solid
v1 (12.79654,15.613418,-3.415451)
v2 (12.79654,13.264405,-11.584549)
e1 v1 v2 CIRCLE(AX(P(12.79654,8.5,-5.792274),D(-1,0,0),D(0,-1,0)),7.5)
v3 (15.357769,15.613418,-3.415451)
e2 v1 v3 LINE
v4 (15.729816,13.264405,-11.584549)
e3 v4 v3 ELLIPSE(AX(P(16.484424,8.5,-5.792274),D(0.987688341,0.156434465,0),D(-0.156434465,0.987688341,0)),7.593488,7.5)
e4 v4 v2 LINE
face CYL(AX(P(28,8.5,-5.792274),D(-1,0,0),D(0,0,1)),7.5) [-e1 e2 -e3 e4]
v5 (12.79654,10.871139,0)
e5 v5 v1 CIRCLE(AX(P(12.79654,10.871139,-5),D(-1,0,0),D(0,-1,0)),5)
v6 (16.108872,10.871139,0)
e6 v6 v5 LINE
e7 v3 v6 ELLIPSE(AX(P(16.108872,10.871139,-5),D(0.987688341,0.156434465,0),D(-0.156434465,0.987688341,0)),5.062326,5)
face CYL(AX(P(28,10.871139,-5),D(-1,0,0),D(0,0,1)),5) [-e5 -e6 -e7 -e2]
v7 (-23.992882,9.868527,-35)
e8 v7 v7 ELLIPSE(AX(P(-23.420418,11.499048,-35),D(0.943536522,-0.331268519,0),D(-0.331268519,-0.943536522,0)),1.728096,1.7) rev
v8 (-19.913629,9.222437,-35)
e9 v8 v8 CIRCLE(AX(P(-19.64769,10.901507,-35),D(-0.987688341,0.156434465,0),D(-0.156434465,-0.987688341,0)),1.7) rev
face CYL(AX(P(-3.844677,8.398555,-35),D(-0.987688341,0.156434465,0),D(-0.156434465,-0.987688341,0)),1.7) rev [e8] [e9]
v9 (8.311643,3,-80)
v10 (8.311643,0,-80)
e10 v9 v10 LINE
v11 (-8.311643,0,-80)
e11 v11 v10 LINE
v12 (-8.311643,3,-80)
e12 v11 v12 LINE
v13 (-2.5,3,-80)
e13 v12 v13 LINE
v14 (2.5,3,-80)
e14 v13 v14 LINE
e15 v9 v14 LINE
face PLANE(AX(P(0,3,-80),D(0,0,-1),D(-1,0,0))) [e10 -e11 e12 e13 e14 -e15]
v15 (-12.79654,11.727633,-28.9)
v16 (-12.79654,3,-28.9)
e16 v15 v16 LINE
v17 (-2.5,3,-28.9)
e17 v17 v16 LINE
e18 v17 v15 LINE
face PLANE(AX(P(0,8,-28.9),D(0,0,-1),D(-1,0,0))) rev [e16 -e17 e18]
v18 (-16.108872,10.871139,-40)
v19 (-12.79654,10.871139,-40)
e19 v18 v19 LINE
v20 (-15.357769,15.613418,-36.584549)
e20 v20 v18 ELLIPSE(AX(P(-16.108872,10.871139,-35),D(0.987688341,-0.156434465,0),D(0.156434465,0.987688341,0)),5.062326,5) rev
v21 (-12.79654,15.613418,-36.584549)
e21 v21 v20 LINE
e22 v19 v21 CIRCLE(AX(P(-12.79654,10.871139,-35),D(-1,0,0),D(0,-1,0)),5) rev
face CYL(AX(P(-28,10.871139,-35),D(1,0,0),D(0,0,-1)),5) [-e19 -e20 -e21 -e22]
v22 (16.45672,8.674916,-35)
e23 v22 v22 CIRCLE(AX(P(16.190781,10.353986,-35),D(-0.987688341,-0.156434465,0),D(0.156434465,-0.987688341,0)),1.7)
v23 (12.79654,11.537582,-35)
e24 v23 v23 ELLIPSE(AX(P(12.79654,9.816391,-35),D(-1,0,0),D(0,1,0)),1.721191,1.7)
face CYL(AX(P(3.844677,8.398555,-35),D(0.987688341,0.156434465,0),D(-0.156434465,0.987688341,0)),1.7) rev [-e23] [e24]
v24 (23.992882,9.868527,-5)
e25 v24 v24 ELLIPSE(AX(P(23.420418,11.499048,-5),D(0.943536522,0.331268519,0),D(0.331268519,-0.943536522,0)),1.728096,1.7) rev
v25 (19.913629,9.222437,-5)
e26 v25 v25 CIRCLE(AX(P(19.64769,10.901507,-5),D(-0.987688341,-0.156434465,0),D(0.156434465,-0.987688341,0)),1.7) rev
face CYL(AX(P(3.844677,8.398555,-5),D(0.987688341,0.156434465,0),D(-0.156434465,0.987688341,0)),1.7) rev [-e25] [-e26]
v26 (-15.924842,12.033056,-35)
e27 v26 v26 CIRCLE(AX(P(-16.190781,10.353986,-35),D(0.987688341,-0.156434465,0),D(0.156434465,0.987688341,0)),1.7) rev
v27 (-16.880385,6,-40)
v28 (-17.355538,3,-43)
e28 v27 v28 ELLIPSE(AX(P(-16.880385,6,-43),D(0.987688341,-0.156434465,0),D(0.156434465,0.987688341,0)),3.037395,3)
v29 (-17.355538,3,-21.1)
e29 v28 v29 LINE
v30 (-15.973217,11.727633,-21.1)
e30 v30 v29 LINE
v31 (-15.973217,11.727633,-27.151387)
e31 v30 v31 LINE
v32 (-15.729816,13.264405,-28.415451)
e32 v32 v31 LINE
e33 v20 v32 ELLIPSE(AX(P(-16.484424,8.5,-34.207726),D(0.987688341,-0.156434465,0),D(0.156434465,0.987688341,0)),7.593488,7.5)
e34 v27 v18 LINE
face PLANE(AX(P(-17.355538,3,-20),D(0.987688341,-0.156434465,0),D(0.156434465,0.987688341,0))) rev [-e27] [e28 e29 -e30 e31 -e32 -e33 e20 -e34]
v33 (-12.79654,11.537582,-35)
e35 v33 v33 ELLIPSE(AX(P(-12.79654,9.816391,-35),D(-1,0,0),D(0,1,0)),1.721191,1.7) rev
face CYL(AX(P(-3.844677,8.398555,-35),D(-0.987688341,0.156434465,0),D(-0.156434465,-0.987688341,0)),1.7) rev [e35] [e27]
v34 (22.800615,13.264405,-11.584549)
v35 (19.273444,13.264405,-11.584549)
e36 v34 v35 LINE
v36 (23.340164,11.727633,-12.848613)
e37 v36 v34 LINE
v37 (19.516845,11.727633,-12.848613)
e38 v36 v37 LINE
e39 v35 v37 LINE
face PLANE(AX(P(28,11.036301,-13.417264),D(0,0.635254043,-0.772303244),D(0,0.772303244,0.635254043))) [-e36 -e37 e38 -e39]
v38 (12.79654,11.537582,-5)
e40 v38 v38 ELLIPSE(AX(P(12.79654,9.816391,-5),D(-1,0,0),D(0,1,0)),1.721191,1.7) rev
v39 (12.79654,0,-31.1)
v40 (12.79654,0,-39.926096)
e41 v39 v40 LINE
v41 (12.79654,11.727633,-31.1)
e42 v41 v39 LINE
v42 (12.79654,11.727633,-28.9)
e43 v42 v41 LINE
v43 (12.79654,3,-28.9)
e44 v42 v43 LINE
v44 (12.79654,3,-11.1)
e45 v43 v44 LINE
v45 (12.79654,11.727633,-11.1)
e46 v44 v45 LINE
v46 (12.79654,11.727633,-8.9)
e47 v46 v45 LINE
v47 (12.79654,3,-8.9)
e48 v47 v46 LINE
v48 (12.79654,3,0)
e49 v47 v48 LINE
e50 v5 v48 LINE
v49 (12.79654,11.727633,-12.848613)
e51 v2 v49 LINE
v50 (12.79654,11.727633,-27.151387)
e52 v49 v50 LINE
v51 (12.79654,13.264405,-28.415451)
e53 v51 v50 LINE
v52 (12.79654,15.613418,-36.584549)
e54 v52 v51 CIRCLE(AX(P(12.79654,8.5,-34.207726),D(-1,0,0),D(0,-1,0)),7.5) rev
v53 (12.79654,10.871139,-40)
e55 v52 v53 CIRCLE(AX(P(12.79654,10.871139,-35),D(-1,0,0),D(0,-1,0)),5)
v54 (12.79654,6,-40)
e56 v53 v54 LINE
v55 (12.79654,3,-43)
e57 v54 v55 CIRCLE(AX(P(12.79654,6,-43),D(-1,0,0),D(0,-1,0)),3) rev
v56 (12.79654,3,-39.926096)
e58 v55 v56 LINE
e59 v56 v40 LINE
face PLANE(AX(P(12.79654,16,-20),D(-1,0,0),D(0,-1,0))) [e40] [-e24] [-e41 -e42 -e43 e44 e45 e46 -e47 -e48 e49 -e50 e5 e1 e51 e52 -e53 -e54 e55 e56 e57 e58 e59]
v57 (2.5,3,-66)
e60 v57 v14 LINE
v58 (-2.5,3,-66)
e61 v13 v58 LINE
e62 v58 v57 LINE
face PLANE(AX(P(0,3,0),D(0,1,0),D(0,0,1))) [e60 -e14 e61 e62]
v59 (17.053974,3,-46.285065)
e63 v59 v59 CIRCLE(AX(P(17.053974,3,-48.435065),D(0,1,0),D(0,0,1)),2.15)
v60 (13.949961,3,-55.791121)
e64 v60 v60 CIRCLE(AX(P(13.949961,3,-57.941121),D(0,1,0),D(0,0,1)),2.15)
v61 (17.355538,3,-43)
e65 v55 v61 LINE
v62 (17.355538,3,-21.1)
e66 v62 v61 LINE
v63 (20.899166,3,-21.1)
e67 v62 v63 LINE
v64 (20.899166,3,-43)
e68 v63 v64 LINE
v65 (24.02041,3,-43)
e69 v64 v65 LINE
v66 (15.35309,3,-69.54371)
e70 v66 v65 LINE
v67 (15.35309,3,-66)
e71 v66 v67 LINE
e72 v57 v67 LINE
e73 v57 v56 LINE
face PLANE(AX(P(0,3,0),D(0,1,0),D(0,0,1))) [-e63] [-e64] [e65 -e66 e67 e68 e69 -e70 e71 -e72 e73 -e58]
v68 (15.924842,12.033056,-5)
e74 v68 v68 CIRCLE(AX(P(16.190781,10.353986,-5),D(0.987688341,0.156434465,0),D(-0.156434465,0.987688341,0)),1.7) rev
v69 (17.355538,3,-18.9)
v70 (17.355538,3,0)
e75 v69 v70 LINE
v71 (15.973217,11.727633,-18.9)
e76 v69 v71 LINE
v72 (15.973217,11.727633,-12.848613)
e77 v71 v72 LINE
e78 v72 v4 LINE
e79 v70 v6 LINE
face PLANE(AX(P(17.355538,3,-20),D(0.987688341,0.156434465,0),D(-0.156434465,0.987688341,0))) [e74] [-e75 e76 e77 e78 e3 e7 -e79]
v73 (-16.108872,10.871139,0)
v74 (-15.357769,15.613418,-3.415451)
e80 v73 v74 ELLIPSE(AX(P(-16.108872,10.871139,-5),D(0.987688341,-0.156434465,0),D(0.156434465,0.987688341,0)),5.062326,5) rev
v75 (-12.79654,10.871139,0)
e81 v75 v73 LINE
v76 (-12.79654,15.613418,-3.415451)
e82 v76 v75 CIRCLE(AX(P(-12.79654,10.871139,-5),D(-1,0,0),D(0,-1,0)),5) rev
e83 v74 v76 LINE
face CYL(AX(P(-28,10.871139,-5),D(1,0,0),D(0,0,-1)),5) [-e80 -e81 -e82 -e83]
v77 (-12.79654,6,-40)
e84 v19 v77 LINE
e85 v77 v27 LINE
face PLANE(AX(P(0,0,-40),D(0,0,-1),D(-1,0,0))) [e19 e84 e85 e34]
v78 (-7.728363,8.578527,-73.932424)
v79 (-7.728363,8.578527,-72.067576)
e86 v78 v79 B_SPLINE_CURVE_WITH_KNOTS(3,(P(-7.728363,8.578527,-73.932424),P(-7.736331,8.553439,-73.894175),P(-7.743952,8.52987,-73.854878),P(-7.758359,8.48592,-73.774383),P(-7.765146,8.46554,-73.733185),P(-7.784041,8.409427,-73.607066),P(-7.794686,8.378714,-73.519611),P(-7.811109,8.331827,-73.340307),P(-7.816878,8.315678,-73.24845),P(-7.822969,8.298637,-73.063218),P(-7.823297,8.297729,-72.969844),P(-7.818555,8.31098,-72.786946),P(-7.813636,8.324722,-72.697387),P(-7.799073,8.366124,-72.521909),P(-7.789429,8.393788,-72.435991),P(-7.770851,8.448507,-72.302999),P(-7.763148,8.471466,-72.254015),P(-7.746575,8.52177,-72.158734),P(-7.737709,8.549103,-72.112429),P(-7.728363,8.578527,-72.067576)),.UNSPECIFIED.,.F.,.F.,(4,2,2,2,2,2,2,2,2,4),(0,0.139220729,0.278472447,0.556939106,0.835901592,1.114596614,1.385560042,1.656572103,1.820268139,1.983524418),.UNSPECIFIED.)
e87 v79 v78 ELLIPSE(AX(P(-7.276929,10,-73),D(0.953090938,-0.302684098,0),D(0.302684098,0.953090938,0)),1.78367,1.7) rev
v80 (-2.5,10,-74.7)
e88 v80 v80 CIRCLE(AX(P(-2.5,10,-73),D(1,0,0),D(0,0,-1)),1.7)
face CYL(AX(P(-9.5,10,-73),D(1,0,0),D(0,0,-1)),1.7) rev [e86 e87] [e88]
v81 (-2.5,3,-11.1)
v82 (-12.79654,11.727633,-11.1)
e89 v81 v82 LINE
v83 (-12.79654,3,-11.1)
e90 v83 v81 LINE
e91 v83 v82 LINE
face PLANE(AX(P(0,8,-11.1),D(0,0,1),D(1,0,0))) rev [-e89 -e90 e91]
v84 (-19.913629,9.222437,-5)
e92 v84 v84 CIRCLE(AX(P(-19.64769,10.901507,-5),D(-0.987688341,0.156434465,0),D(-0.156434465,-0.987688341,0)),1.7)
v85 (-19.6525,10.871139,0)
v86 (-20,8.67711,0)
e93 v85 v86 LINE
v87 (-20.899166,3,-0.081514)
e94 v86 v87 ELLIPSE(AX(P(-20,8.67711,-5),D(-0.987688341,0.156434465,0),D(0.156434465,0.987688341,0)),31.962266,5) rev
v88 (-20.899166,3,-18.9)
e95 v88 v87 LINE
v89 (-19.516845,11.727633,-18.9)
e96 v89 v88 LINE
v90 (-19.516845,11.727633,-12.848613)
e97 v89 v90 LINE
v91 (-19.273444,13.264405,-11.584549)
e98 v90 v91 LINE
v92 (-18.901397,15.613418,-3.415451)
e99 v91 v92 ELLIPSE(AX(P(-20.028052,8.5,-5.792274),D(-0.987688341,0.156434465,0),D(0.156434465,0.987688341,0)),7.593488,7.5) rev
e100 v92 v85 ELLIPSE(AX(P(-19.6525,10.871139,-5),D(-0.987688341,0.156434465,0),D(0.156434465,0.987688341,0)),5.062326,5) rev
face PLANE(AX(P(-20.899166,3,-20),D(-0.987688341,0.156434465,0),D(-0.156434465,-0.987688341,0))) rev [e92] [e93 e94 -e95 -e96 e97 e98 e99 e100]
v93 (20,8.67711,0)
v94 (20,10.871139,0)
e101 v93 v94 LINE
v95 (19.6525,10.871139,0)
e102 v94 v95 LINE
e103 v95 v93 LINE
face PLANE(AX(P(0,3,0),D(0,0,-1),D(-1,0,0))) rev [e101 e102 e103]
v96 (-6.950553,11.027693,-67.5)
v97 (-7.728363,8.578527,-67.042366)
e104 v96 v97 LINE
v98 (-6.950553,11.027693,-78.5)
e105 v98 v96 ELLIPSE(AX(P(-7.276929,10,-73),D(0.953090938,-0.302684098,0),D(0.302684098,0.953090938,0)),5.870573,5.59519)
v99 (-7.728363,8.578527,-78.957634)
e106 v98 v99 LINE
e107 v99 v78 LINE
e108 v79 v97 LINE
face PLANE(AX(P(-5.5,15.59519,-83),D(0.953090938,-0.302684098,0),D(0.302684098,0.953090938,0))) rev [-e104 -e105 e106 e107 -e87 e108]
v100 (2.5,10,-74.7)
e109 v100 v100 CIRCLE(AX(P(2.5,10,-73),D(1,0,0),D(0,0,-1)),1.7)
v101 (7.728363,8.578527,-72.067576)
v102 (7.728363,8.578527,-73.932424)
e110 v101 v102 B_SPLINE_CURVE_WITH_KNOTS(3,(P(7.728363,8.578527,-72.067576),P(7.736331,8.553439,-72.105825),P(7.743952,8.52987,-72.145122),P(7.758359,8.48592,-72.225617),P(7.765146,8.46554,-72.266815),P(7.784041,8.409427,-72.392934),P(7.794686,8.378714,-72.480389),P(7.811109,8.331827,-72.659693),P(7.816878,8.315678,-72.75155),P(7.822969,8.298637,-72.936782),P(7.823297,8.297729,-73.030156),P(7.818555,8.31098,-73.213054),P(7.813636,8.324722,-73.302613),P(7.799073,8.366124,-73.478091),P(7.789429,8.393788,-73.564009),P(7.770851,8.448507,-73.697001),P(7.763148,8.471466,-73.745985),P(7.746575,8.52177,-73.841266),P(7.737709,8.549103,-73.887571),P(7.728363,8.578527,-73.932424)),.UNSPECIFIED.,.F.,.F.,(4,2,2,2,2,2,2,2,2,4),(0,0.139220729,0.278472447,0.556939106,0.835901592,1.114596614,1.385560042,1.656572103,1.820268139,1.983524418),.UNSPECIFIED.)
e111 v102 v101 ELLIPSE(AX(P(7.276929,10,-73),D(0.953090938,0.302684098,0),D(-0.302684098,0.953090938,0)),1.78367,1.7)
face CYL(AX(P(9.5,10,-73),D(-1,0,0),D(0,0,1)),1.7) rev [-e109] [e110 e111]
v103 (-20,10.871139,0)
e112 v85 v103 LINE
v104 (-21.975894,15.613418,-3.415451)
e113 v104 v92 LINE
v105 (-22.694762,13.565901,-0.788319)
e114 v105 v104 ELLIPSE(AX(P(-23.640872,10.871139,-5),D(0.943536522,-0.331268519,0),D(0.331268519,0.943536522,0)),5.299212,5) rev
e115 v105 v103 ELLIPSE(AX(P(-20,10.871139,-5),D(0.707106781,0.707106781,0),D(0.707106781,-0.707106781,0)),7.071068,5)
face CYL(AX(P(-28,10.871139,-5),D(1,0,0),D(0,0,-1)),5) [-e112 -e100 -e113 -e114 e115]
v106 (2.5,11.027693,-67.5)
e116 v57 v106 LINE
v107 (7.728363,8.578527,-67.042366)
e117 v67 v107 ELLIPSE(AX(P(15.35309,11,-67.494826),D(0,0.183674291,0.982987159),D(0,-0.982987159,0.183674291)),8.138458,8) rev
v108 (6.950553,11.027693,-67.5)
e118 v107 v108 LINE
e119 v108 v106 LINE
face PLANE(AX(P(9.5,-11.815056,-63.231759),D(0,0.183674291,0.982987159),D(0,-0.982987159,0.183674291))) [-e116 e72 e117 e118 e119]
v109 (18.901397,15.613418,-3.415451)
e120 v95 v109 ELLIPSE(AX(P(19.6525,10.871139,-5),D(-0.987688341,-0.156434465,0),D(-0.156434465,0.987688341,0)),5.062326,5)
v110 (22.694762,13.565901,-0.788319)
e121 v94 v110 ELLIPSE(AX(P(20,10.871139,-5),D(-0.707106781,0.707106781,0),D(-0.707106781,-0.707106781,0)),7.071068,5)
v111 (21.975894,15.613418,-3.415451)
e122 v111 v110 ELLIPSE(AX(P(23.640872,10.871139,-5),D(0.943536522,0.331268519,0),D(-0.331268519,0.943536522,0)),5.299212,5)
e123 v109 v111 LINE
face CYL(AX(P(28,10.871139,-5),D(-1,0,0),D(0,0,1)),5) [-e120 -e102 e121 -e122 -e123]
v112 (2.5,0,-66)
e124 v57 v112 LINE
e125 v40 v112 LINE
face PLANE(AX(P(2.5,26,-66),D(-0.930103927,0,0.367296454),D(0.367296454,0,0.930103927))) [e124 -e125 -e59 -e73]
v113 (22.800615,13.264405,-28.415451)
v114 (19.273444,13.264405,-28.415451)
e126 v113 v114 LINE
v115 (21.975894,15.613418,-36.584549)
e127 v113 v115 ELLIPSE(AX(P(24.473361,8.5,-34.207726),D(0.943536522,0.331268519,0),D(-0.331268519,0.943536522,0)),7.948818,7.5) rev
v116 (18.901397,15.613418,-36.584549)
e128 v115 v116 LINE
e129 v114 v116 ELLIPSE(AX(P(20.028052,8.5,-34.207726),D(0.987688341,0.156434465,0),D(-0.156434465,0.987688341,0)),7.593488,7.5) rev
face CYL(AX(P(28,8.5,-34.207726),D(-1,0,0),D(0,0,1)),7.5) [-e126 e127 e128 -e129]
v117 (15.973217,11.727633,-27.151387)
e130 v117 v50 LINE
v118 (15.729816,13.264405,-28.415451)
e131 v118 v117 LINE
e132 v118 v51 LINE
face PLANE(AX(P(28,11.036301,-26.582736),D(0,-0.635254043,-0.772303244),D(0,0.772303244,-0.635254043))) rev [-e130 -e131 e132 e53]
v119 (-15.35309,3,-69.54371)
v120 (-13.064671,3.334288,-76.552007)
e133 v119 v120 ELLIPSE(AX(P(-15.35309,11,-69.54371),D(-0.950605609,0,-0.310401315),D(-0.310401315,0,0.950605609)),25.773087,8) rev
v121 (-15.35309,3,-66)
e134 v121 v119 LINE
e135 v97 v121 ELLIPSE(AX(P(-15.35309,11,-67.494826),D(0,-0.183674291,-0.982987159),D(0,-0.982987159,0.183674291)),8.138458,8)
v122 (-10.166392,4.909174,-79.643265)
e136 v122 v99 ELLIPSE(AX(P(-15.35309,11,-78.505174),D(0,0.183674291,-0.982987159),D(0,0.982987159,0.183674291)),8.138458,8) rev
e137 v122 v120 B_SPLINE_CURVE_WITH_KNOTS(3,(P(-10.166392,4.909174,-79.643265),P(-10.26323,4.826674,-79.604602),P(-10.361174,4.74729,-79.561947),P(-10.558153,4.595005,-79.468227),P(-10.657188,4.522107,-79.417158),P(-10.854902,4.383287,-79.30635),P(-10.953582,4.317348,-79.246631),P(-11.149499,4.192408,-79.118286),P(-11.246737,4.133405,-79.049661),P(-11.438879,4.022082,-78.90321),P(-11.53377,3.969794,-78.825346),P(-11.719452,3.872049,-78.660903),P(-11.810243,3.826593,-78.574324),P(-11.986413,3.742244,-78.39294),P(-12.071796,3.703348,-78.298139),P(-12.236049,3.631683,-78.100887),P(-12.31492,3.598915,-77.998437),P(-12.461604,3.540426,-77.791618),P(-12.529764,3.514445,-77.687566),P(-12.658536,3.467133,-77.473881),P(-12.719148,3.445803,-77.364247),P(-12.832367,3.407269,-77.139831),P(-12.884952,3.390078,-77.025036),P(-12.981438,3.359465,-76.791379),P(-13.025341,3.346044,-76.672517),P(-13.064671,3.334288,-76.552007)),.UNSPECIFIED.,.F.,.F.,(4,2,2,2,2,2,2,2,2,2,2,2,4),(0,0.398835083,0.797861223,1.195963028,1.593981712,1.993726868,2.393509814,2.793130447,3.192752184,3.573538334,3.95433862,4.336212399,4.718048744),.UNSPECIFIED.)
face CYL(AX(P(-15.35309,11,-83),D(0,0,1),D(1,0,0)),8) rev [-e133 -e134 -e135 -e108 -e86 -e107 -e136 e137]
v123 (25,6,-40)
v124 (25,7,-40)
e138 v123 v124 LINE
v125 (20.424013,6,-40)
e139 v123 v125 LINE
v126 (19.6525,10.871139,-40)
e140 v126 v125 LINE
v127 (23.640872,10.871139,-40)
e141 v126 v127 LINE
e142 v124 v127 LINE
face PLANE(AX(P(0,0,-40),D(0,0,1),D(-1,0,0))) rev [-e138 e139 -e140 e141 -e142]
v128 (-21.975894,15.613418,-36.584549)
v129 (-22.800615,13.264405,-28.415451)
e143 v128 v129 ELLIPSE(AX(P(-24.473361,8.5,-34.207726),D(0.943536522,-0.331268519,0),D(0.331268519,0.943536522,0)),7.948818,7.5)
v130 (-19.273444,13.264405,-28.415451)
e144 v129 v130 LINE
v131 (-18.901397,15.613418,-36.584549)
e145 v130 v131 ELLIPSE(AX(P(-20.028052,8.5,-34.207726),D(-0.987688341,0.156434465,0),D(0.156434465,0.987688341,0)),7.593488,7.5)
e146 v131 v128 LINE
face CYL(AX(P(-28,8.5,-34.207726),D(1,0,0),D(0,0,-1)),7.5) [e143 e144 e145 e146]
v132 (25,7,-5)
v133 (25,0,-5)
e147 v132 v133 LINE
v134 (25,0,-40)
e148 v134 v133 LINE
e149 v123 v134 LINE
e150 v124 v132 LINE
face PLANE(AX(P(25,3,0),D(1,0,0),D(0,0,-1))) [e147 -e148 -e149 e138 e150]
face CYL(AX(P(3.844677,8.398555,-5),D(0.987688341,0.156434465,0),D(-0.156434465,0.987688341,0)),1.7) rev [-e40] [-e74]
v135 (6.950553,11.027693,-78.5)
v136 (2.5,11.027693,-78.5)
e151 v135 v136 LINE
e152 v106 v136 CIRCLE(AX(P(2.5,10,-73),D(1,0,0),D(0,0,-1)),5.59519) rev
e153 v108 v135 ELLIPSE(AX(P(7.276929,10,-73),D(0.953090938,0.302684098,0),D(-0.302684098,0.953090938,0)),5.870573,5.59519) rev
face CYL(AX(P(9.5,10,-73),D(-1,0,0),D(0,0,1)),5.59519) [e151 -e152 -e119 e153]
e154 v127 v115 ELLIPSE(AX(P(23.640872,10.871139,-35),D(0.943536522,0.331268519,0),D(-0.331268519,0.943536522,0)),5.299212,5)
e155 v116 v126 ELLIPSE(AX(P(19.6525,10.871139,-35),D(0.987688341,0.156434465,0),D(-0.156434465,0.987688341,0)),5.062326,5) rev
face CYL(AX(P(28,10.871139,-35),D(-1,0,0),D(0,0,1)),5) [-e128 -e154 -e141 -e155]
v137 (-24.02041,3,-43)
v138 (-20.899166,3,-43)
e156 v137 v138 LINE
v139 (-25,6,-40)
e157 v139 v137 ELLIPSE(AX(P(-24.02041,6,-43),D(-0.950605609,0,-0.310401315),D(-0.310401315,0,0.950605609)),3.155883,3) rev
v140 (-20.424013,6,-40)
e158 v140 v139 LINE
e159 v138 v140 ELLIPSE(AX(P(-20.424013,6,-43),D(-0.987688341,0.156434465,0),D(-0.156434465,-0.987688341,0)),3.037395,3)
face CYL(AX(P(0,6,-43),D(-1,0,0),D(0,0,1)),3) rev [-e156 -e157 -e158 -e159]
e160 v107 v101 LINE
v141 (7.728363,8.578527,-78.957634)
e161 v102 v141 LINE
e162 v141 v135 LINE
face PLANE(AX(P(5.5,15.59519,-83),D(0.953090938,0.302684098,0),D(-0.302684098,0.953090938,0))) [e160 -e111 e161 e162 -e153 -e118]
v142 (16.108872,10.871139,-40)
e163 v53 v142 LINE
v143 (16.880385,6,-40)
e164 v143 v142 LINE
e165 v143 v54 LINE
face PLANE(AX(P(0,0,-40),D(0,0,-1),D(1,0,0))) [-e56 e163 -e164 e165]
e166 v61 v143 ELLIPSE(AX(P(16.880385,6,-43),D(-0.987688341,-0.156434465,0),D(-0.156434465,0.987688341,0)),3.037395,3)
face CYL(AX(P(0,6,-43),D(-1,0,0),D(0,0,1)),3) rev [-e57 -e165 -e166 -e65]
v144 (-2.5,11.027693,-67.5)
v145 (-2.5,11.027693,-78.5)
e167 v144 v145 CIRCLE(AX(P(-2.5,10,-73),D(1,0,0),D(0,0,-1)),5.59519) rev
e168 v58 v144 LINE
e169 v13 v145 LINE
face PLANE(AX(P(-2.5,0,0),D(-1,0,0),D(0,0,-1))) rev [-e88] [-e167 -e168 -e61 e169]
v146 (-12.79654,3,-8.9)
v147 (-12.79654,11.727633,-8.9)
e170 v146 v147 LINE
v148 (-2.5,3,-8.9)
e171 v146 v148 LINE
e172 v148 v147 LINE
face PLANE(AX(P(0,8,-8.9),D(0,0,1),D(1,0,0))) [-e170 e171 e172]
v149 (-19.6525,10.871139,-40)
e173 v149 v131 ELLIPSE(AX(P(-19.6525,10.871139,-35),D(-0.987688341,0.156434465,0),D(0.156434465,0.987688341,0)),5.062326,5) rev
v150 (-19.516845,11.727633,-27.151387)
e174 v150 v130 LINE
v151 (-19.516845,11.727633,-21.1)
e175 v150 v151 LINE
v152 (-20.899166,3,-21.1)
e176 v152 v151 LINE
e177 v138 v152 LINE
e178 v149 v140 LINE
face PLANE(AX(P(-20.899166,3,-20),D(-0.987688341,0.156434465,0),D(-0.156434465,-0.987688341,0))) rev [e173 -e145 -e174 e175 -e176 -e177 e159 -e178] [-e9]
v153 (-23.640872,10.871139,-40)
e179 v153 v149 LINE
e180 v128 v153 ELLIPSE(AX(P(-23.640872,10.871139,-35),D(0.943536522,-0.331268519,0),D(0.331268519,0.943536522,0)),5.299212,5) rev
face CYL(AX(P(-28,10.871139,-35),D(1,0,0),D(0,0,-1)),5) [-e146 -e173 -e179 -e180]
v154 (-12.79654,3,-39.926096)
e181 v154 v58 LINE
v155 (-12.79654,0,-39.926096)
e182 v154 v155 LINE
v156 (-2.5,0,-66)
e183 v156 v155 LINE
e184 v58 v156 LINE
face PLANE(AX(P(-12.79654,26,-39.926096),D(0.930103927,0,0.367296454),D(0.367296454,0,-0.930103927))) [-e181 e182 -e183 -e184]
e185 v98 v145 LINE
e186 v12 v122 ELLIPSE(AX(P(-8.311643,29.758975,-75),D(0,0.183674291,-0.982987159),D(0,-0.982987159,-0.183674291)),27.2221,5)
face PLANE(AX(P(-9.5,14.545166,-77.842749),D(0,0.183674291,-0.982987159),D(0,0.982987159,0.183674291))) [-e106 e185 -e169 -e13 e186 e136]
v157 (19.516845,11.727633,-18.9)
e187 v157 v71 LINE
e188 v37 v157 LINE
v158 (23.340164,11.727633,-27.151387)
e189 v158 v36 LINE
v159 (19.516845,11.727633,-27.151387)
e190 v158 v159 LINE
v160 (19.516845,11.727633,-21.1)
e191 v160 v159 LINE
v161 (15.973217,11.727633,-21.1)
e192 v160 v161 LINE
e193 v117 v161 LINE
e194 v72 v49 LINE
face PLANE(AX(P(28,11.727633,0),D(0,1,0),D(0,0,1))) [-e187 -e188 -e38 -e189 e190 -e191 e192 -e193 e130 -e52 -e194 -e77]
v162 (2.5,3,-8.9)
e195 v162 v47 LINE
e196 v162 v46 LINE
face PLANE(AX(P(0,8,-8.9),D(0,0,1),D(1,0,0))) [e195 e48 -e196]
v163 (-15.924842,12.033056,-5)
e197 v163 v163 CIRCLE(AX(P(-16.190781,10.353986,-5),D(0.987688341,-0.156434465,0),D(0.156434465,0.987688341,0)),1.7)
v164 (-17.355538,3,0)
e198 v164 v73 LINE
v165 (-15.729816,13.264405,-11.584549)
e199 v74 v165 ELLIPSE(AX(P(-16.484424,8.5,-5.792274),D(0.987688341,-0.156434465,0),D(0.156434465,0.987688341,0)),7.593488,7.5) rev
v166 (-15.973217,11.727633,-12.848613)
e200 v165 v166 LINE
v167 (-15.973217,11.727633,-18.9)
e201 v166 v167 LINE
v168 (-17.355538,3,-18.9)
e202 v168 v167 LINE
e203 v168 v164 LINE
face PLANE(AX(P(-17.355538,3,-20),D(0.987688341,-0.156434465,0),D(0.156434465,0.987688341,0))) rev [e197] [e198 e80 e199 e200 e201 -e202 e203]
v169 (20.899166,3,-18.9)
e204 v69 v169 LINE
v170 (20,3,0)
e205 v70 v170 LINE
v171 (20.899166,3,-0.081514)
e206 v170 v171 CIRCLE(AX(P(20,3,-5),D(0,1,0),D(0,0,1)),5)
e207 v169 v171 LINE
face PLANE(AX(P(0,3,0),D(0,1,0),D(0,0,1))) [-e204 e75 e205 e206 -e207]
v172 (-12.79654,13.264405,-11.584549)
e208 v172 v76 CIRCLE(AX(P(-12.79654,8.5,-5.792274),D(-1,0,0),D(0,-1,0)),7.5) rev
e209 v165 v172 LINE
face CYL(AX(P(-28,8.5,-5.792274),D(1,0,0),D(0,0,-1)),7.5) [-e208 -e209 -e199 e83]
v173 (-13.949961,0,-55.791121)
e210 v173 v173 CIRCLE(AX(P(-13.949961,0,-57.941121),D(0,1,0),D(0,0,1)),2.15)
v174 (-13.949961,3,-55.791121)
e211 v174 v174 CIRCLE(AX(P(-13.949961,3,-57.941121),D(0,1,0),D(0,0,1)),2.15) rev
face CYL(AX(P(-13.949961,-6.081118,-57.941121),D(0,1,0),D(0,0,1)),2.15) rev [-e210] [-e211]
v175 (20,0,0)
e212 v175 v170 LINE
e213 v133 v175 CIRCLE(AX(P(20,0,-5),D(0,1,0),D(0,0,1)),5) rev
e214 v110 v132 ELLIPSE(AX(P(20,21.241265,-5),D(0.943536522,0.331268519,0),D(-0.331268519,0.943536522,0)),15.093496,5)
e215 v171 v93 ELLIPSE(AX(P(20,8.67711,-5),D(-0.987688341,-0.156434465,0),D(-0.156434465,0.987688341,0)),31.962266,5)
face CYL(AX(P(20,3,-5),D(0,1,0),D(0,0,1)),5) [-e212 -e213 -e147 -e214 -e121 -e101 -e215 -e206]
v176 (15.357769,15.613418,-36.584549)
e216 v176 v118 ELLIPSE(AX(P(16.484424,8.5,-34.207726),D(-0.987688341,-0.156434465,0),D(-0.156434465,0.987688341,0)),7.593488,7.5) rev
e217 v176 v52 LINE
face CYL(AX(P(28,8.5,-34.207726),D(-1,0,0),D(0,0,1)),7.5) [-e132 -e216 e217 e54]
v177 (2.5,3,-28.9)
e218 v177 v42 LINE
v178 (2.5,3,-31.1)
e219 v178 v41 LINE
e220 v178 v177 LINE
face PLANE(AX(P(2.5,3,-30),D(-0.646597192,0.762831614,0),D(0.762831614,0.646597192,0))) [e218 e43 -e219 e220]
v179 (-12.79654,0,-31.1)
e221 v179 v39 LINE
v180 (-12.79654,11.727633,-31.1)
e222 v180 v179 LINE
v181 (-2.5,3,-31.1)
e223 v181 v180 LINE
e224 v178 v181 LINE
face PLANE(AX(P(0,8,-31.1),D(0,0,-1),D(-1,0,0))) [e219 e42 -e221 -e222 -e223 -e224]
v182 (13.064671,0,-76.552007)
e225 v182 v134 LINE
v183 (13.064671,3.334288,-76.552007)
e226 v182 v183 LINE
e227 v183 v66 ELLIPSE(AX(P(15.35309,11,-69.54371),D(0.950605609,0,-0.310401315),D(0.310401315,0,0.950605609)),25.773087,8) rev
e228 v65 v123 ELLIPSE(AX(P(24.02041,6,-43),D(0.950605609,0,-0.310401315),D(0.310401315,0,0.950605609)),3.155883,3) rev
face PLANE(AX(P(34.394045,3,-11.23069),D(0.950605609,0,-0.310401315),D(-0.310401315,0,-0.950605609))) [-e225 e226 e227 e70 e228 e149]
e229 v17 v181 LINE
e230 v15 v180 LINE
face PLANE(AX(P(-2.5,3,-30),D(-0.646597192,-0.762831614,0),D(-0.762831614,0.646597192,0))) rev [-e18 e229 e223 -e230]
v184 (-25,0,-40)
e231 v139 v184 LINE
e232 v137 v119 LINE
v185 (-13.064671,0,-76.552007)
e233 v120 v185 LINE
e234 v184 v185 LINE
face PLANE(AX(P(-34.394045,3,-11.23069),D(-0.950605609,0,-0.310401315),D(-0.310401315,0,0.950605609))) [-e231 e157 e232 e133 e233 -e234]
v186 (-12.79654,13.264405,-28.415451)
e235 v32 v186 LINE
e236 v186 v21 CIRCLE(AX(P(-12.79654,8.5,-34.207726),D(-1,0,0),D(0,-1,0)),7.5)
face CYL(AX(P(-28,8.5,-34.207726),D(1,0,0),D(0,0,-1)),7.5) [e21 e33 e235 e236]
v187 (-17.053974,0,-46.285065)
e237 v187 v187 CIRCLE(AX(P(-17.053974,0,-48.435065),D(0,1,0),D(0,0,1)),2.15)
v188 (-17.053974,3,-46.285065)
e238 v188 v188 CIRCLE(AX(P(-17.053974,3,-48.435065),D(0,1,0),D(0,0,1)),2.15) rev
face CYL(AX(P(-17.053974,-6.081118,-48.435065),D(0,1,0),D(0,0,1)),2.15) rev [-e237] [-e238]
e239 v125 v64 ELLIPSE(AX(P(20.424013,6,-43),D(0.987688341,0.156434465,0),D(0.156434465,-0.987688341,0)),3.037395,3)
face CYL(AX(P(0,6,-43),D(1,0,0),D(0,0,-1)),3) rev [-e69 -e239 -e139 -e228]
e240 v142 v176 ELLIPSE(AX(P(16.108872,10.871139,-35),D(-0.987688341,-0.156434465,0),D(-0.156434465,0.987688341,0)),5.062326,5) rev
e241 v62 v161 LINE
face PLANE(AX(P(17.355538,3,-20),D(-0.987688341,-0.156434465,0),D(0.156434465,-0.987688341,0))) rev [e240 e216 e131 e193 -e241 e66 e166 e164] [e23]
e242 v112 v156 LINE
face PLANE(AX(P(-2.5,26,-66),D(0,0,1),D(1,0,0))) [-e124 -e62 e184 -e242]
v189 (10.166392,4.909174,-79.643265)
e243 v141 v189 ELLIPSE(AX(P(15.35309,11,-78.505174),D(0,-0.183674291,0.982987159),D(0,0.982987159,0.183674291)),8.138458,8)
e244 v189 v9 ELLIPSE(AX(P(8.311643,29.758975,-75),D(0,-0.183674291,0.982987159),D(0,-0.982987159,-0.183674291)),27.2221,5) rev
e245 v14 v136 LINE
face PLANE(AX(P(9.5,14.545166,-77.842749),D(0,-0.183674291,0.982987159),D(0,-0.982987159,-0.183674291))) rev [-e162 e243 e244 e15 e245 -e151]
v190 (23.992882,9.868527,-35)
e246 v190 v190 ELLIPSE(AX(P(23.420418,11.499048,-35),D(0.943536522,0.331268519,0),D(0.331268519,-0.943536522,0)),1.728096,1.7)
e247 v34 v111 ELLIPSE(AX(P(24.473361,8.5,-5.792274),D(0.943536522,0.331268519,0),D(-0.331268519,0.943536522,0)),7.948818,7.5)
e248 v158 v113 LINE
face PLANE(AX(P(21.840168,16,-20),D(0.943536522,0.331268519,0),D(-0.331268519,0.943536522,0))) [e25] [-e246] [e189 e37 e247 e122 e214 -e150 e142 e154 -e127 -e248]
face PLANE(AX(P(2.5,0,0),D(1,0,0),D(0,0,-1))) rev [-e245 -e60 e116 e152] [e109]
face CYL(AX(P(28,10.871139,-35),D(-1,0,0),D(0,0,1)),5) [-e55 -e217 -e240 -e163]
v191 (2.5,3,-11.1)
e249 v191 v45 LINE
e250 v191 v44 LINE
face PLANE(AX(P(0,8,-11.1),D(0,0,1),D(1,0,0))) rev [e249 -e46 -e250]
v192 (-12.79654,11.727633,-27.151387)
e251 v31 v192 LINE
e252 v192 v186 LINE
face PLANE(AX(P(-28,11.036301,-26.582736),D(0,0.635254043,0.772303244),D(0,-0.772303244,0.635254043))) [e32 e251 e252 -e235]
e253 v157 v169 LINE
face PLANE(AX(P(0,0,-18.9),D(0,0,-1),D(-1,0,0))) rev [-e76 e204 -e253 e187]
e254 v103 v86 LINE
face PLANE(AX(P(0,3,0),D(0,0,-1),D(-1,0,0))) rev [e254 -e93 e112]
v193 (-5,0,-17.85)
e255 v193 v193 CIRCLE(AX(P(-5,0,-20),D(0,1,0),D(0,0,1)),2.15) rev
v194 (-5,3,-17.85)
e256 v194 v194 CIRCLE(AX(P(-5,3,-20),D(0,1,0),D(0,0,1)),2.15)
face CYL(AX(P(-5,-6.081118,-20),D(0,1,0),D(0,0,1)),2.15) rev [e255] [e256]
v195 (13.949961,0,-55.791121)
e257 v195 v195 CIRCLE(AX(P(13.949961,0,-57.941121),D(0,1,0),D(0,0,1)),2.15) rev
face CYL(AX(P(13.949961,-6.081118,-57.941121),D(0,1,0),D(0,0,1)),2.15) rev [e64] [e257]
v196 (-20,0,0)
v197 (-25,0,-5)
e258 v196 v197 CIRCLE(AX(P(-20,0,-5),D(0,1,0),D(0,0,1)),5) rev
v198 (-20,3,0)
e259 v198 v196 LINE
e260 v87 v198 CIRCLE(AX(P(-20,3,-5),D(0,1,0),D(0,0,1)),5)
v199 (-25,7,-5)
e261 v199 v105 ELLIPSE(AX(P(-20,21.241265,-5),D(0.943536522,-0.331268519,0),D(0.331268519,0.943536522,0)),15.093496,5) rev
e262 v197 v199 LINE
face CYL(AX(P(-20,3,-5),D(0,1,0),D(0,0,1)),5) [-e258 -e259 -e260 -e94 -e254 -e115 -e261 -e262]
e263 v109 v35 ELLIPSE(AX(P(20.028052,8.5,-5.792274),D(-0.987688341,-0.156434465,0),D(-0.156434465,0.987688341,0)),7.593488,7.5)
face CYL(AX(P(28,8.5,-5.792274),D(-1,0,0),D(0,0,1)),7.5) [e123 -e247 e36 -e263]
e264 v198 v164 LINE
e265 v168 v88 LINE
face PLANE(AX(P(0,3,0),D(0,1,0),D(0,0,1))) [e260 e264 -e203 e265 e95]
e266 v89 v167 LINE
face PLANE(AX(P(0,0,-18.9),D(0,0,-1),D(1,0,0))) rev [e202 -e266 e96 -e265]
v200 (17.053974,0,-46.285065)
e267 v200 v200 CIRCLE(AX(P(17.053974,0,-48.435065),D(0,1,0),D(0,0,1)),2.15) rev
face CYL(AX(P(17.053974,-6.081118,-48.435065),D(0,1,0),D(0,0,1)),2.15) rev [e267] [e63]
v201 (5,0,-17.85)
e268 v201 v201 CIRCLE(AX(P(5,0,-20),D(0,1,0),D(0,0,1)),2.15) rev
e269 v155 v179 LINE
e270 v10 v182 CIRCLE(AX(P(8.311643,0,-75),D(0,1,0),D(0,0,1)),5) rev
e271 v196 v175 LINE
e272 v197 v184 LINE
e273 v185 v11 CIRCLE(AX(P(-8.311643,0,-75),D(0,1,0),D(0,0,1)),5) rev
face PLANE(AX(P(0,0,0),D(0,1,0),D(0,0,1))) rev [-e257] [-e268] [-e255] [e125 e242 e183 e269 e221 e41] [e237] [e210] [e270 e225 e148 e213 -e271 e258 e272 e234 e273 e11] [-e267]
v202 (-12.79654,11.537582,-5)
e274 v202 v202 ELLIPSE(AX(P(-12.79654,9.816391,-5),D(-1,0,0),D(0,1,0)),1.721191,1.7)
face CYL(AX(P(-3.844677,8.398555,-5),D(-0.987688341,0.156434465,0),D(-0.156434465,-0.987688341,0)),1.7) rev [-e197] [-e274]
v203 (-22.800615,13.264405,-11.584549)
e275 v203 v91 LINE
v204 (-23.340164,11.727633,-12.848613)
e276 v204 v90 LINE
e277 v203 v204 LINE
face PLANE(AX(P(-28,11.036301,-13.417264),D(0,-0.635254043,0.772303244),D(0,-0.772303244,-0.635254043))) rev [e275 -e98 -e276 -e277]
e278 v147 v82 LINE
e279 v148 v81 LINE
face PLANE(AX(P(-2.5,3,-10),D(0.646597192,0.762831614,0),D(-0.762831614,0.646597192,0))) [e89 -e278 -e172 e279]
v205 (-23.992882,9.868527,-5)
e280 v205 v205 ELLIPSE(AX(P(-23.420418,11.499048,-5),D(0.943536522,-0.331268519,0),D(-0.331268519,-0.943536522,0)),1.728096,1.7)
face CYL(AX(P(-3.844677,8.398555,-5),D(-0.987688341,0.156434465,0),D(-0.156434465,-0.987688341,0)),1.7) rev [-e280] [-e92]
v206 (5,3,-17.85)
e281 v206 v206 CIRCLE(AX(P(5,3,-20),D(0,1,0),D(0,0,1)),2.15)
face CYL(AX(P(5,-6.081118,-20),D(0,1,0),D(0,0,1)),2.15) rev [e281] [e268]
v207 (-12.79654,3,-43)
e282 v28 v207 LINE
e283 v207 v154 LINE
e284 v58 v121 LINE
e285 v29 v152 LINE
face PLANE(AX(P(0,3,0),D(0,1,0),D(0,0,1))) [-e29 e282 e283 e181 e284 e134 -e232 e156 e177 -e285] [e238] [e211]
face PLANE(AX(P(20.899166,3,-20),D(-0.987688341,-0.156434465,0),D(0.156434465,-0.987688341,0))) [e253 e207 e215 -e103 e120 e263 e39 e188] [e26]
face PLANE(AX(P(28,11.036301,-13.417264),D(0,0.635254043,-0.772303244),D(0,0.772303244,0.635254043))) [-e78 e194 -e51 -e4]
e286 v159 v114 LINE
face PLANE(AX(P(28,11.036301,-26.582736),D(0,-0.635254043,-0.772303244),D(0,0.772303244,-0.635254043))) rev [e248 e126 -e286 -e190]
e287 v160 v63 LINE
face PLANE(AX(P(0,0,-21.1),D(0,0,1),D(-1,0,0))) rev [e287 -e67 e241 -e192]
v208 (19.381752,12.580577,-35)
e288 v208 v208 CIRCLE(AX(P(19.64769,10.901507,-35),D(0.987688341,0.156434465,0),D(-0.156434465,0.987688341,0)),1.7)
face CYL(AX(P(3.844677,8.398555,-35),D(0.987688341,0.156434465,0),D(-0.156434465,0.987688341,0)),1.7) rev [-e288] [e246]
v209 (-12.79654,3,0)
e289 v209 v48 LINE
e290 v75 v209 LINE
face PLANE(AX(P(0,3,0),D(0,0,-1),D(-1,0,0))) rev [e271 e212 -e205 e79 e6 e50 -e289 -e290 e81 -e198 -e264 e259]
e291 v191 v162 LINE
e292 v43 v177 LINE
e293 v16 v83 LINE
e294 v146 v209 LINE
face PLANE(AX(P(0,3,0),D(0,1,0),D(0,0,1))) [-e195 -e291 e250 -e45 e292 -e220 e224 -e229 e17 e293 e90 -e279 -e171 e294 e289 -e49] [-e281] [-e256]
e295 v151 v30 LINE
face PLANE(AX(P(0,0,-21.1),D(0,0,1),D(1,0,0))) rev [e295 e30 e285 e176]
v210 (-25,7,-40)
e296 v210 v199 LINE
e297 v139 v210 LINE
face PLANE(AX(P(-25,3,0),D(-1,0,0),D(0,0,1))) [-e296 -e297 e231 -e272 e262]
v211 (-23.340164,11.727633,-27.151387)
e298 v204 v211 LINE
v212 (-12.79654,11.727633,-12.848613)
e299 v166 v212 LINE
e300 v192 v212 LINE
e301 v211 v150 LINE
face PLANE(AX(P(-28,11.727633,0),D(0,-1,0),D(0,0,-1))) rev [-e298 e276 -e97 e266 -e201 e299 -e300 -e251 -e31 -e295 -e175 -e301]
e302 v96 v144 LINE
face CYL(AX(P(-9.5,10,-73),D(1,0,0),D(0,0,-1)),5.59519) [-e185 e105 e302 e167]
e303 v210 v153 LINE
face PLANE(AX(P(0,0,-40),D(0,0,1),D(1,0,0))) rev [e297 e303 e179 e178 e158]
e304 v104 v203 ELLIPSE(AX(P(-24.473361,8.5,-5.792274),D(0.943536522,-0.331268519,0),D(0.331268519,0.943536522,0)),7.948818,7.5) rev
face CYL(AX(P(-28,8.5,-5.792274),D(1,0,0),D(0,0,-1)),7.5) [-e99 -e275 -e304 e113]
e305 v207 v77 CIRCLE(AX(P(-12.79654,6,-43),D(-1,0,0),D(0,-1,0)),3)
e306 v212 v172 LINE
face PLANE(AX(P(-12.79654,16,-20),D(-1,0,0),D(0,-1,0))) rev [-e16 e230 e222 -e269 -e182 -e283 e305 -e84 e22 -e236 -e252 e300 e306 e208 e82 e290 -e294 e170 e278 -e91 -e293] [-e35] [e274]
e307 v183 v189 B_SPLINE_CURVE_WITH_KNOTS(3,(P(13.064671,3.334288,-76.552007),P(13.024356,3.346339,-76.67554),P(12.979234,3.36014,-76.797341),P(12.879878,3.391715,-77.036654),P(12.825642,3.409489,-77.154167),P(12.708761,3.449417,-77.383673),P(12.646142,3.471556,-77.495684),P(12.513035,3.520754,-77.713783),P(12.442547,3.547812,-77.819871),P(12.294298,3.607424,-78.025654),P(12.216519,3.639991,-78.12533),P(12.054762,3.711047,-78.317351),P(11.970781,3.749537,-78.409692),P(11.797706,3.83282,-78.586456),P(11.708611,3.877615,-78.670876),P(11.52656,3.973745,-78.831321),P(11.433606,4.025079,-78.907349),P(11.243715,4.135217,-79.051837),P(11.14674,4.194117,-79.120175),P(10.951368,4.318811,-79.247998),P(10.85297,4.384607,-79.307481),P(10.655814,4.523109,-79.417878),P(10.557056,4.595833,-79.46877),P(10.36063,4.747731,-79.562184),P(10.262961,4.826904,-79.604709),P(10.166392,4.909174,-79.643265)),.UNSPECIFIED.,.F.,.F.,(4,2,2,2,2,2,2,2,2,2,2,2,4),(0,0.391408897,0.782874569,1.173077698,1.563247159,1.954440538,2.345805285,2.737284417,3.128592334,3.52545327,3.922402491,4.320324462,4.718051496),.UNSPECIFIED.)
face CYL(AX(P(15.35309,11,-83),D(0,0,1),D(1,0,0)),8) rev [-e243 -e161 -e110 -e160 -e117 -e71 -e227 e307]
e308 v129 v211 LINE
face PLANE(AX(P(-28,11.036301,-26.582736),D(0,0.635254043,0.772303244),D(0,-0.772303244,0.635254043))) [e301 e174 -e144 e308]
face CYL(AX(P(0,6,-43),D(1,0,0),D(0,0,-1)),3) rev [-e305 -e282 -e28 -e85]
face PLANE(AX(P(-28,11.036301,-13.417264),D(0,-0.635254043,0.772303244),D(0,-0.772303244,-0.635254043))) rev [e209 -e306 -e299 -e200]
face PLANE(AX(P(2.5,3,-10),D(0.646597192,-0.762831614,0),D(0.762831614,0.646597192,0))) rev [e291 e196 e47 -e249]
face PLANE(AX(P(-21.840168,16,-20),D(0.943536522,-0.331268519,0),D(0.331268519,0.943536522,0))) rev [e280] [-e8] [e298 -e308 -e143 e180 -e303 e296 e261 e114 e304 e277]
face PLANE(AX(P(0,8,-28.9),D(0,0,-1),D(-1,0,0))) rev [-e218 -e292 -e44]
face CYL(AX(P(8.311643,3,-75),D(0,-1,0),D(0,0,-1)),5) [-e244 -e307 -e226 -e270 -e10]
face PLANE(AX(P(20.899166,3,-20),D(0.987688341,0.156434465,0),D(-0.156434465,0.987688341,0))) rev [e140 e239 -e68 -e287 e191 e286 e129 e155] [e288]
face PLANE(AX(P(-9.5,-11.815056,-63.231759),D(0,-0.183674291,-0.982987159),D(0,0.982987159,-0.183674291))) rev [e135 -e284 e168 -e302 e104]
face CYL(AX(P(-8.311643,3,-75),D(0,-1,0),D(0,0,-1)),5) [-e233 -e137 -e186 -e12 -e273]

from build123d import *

# Parameters (mm, degrees)
BOSS_EXTRUDE1_DEPTH                        = 3
SKETCH2_R                                  = 1.7
BOSS_EXTRUDE2_DEPTH                        = 7
CUT_EXTRUDE1_DEPTH                         = 10
FILLET1_R                                  = 8
FILLET1_OF_MIRROR1_R                       = 8
BOSS_EXTRUDE4_DEPTH                        = 20
CUT_EXTRUDE2_DEPTH                         = 28
SKETCH8_R                                  = 1.7
CUT_EXTRUDE3_DEPTH                         = 16
BOSS_EXTRUDE17_DEPTH                       = 1.1
RIB29_REACH                                = 78.033
SKETCH25_WALL_W                            = 167.563564406
SKETCH25_WALL_H                            = 2.2
MIRROR17_AT_THE_SECOND_PLANE_COPY_1_DEPTH  = 20
MIRROR17_AT_THE_SECOND_PLANE_COPY_2_DEPTH  = 28
MIRROR17_AT_THE_SECOND_PLANE_COPY_3_SKET_R = 1.7
MIRROR17_AT_THE_SECOND_PLANE_COPY_3_DEPTH  = 16
MIRROR17_AT_THE_SECOND_PLANE_COPY_4_DEPTH  = 1.1
MIRROR17_AT_THE_SECOND_PLANE_COPY_5_REACH  = 78.033
MIRROR17_AT_THE_SECOND_PLANE_COPY_5_SKET_W = 167.563564406
MIRROR17_AT_THE_SECOND_PLANE_COPY_5_SKET_H = 2.2
FILLET28_R                                 = 5
FILLET29_R                                 = 3
SKETCH31_R                                 = 2.15
CUT_EXTRUDE13_DEPTH                        = 15
FILLET31_R                                 = 5
CUT_EXTRUDE16_DEPTH                        = 26


with BuildPart() as part:
    # Sketch1 → Boss-Extrude1 (new body)
    with BuildSketch(Plane(origin=(0, 0, 0), x_dir=(1, 0, 0), z_dir=(0, 1, 0))):
        Polygon((-25, 0), (25, 0), (25, 40), (11.938797241, 80), (-11.938797241, 80), (-25, 40), align=None)
    extrude(amount=BOSS_EXTRUDE1_DEPTH)

    # Sketch2 → Boss-Extrude2 (add)
    with BuildSketch(Plane(origin=(2.5, 0, 0), x_dir=(0, 0, -1), z_dir=(1, 0, 0))):
        with BuildLine():
            Line((67.5, 11.027692569), (65.439440417, 0))
            Line((65.439440417, 0), (80, 0))
            Line((80, 0), (80, 3))
            Line((80, 3), (78.5, 11.027692569))
            ThreePointArc((78.5, 11.027692569), (73, 15.595190079), (67.5, 11.027692569))
        make_face()
        with Locations((73, 10)):
            Circle(SKETCH2_R, mode=Mode.SUBTRACT)
    boss_extrude2 = extrude(amount=BOSS_EXTRUDE2_DEPTH)

    # Sketch3 → Cut-Extrude1 (cut, symmetric)
    with BuildSketch(Plane(origin=(0, 0, -73), x_dir=(-1, 0, 0), z_dir=(0, 0, -1))):
        Polygon((-5.5, 15.595190079), (-9.5, 3), (-9.5, 15.595190079), align=None)
    cut_extrude1 = extrude(amount=CUT_EXTRUDE1_DEPTH, both=True, mode=Mode.SUBTRACT)

    # Fillet1
    # the kernel refuses this fillet: 8 mm, written as the material it adds along each edge
    with BuildSketch(Plane(origin=(9.5, 3, -51.367274546), x_dir=(1, 0, 0), z_dir=(0, 0, -1))) as fillet1_piece_1_section:
        with BuildLine():
            CenterArc((FILLET1_R * 0.731636272702, -FILLET1_R), FILLET1_R, 90, 72.381112159)
            Line((-FILLET1_R * 0.221454665552, -FILLET1_R * 0.69731590161), (0, 0))
            Line((0, 0), (FILLET1_R * 0.731636272702, 0))
        make_face()
    fillet1_piece_1 = extrude(amount=28.632725454, mode=Mode.PRIVATE)
    fillet1_piece_1 = split(fillet1_piece_1, bisect_by=Plane(origin=(13.901664909, 4.236506099, -73.988707766), z_dir=(-0.9506056088786227, 0, 0.310401315023798)), keep=Keep.TOP, mode=Mode.PRIVATE)
    fillet1_piece_1 = split(fillet1_piece_1, bisect_by=Plane(origin=(10.280523732, 5.423664208, -66.452869399), z_dir=(0, -0.18367429070645971, -0.9829871590888046)), keep=Keep.TOP, mode=Mode.PRIVATE)
    fillet1_piece_1 = split(fillet1_piece_1, bisect_by=Plane(origin=(10.280523732, 5.493610413, -79.534060929), z_dir=(0, -0.183674290706459, 0.982987159088805)), keep=Keep.TOP, mode=Mode.PRIVATE)
    fillet1_piece_1 = fillet1_piece_1 - Plane(origin=(10.280523732, 10, -73), x_dir=(0, 0, -1), z_dir=(-1, 0, 0)) * Cylinder(1.7, 81, mode=Mode.PRIVATE)
    add(fillet1_piece_1)

    # Mirror1: Boss-Extrude2, Cut-Extrude1 across plane
    add(boss_extrude2.mirror(Plane(origin=(0, 0, 0), x_dir=(0, 0, 1), z_dir=(1, 0, 0))))
    add(cut_extrude1.mirror(Plane(origin=(0, 0, 0), x_dir=(0, 0, 1), z_dir=(1, 0, 0))), mode=Mode.SUBTRACT)

    # Fillet1 of Mirror1
    # the kernel refuses this fillet: 8 mm, written as the material it adds along each edge
    with BuildSketch(Plane(origin=(-9.5, 3, -51.367274546), x_dir=(-1, 0, 0), z_dir=(0, 0, -1))) as fillet1_of_mirror1_piece_1_section:
        with BuildLine():
            CenterArc((FILLET1_OF_MIRROR1_R * 0.731636272702, FILLET1_OF_MIRROR1_R), FILLET1_OF_MIRROR1_R, 197.618887841, 72.381112159)
            Line((-FILLET1_OF_MIRROR1_R * 0.221454665552, FILLET1_OF_MIRROR1_R * 0.69731590161), (0, 0))
            Line((0, 0), (FILLET1_OF_MIRROR1_R * 0.731636272702, 0))
        make_face()
    fillet1_of_mirror1_piece_1 = extrude(amount=28.632725454, mode=Mode.PRIVATE)
    fillet1_of_mirror1_piece_1 = split(fillet1_of_mirror1_piece_1, bisect_by=Plane(origin=(-13.901664909, 4.236506099, -73.988707766), z_dir=(0.9506056088786227, 0, 0.310401315023798)), keep=Keep.TOP, mode=Mode.PRIVATE)
    fillet1_of_mirror1_piece_1 = split(fillet1_of_mirror1_piece_1, bisect_by=Plane(origin=(-10.280523732, 5.423664208, -66.452869399), z_dir=(0, -0.18367429070645971, -0.9829871590888046)), keep=Keep.TOP, mode=Mode.PRIVATE)
    fillet1_of_mirror1_piece_1 = split(fillet1_of_mirror1_piece_1, bisect_by=Plane(origin=(-10.280523732, 5.493610413, -79.534060929), z_dir=(0, -0.183674290706459, 0.982987159088805)), keep=Keep.TOP, mode=Mode.PRIVATE)
    fillet1_of_mirror1_piece_1 = fillet1_of_mirror1_piece_1 - Plane(origin=(-10.280523732, 10, -73), x_dir=(0, 0, -1), z_dir=(1, 0, 0)) * Cylinder(1.7, 81, mode=Mode.PRIVATE)
    add(fillet1_of_mirror1_piece_1)

    # Sketch6 → Boss-Extrude4 (add)
    with BuildSketch(Plane.XY):
        Polygon((20.89916596, 3), (18.840168236, 16), (21.840168236, 16), (25, 7), (25, 3), align=None)
        Polygon((17.35553802, 3), (15.296540296, 16), (12.796540296, 16), (12.796540296, 3), align=None)
    boss_extrude4 = extrude(amount=-BOSS_EXTRUDE4_DEPTH)

    # Sketch7 → Cut-Extrude2 (cut)
    with BuildSketch(Plane(origin=(0, 0, 0), x_dir=(0, 0, -1), z_dir=(1, 0, 0))):
        with BuildLine():
            ThreePointArc((5.79227433, 16), (8.995160535, 15.281704798), (11.584548661, 13.264405323))
            Line((11.584548661, 13.264405323), (12.84861315, 11.727632568))
            Line((12.84861315, 11.727632568), (20, 11.727632568))
            Line((20, 11.727632568), (20, 16))
            Line((20, 16), (10, 16))
            Line((10, 16), (5.79227433, 16))
        make_face()
        with BuildLine():
            ThreePointArc((0, 13.264405323), (2.589388126, 15.281704798), (5.79227433, 16))
            Line((5.79227433, 16), (0, 16))
            Line((0, 16), (0, 13.264405323))
        make_face()
    cut_extrude2 = extrude(amount=CUT_EXTRUDE2_DEPTH, mode=Mode.SUBTRACT)

    # Sketch8 → Cut-Extrude3 (cut, symmetric)
    with BuildSketch(Plane(origin=(20.851252457, 3.302513951, 0), x_dir=(0, 0, 1), z_dir=(-0.9876883405951371, -0.15643446504023534, 0))):
        with Locations(Location((-5, 7.693715175, 0), (0, 0, 90))):
            Circle(SKETCH8_R)
    cut_extrude3 = extrude(amount=CUT_EXTRUDE3_DEPTH, both=True, mode=Mode.SUBTRACT)

    # Sketch22 → Boss-Extrude17 (add)
    with BuildSketch(Plane.XY.offset(-20)):
        Polygon((12.796540296, 11.727632568), (23.340164049, 11.727632568), (25, 7), (25, 3), (20.89916596, 3), (12.796540296, 3), align=None)
    boss_extrude17 = extrude(amount=BOSS_EXTRUDE17_DEPTH)

    # Sketch25 wall → Rib29 (add, up to next)
    with BuildSketch(Plane(origin=(7.648270148, 7.363816284, -10), x_dir=(0.762831614206, 0.646597191741, 0), z_dir=(-0.646597191741, 0.762831614206, 0)), mode=Mode.PRIVATE) as rib29_sk1:
        Rectangle(SKETCH25_WALL_W, SKETCH25_WALL_H)
    rib29_tool1 = extrude(rib29_sk1.sketch, amount=-RIB29_REACH, mode=Mode.PRIVATE) - part.part
    rib29 = rib29_tool1.solids().sort_by_distance((7.648270148, 7.363816284, -10))[0]
    add(rib29)

    # Mirror17: Boss-Extrude4, Cut-Extrude2, Cut-Extrude3, Boss-Extrude17, Rib29 across plane
    add(boss_extrude4.mirror(Plane(origin=(0, 0, 0), x_dir=(0, 0, 1), z_dir=(1, 0, 0))))
    add(cut_extrude2.mirror(Plane(origin=(0, 0, 0), x_dir=(0, 0, 1), z_dir=(1, 0, 0))), mode=Mode.SUBTRACT)
    add(cut_extrude3.mirror(Plane(origin=(0, 0, 0), x_dir=(0, 0, 1), z_dir=(1, 0, 0))), mode=Mode.SUBTRACT)
    add(boss_extrude17.mirror(Plane(origin=(0, 0, 0), x_dir=(0, 0, 1), z_dir=(1, 0, 0))))
    add(rib29.mirror(Plane(origin=(0, 0, 0), x_dir=(0, 0, 1), z_dir=(1, 0, 0))))

    # Mirror17 at the second plane: Boss-Extrude4, Cut-Extrude2, Cut-Extrude3, Boss-Extrude17, Rib29 across plane
    add(boss_extrude4.mirror(Plane.XY.offset(-20)))
    add(cut_extrude2.mirror(Plane.XY.offset(-20)), mode=Mode.SUBTRACT)
    add(cut_extrude3.mirror(Plane.XY.offset(-20)), mode=Mode.SUBTRACT)
    add(boss_extrude17.mirror(Plane.XY.offset(-20)))
    add(rib29.mirror(Plane.XY.offset(-20)))

    # Mirror17 at the second plane copy 1 sket → Mirror17 at the second plane copy 1 (add)
    with BuildSketch(Plane(origin=(0, 0, -40), x_dir=(-1, 0, 0), z_dir=(0, 0, -1))):
        Polygon((20.89916596, 3), (18.840168236, 16), (21.840168236, 16), (25, 7), (25, 3), align=None)
        Polygon((17.35553802, 3), (15.296540296, 16), (12.796540296, 16), (12.796540296, 3), align=None)
    extrude(amount=-MIRROR17_AT_THE_SECOND_PLANE_COPY_1_DEPTH)

    # Mirror17 at the second plane copy 2 sket → Mirror17 at the second plane copy 2 (cut)
    with BuildSketch(Plane(origin=(0, 0, -40), x_dir=(0, 0, 1), z_dir=(-1, 0, 0))):
        with BuildLine():
            ThreePointArc((5.79227433, 16), (8.995160535, 15.281704798), (11.584548661, 13.264405323))
            Line((11.584548661, 13.264405323), (12.84861315, 11.727632568))
            Line((12.84861315, 11.727632568), (20, 11.727632568))
            Line((20, 11.727632568), (20, 16))
            Line((20, 16), (10, 16))
            Line((10, 16), (5.79227433, 16))
        make_face()
        with BuildLine():
            ThreePointArc((0, 13.264405323), (2.589388126, 15.281704798), (5.79227433, 16))
            Line((5.79227433, 16), (0, 16))
            Line((0, 16), (0, 13.264405323))
        make_face()
    extrude(amount=MIRROR17_AT_THE_SECOND_PLANE_COPY_2_DEPTH, mode=Mode.SUBTRACT)

    # Mirror17 at the second plane copy 3 sket → Mirror17 at the second plane copy 3 (cut, symmetric)
    with BuildSketch(Plane(origin=(-20.851252457, 3.302513951, -40), x_dir=(0, 0, -1), z_dir=(0.9876883405951371, -0.15643446504023534, 0))):
        with Locations(Location((-5, 7.693715175, 0), (0, 0, 90))):
            Circle(MIRROR17_AT_THE_SECOND_PLANE_COPY_3_SKET_R)
    extrude(amount=MIRROR17_AT_THE_SECOND_PLANE_COPY_3_DEPTH, both=True, mode=Mode.SUBTRACT)

    # Mirror17 at the second plane copy 4 sket → Mirror17 at the second plane copy 4 (add)
    with BuildSketch(Plane(origin=(0, 0, -20), x_dir=(-1, 0, 0), z_dir=(0, 0, -1))):
        Polygon((12.796540296, 11.727632568), (23.340164049, 11.727632568), (25, 7), (25, 3), (20.89916596, 3), (12.796540296, 3), align=None)
    extrude(amount=MIRROR17_AT_THE_SECOND_PLANE_COPY_4_DEPTH)

    # Mirror17 at the second plane copy 5 sket → Mirror17 at the second plane copy 5 (add, up to next)
    with BuildSketch(Plane(origin=(-7.648270148, 7.363816284, -30), x_dir=(-0.762831614206, 0.646597191741, 0), z_dir=(0.646597191741, 0.762831614206, 0)), mode=Mode.PRIVATE) as mirror17_at_the_second_plane_copy_5_sk1:
        Rectangle(MIRROR17_AT_THE_SECOND_PLANE_COPY_5_SKET_W, MIRROR17_AT_THE_SECOND_PLANE_COPY_5_SKET_H)
    mirror17_at_the_second_plane_copy_5_tool1 = extrude(mirror17_at_the_second_plane_copy_5_sk1.sketch, amount=-MIRROR17_AT_THE_SECOND_PLANE_COPY_5_REACH, mode=Mode.PRIVATE) - part.part
    add(mirror17_at_the_second_plane_copy_5_tool1.solids().sort_by_distance((-7.648270148, 7.363816284, -30))[0])

    # Fillet28
    fillet28_edges = [part.edges().sort_by_distance(p)[0] for p in [
        (21.037029327, 13.264405323, 0),
        (14.263178112, 13.264405323, 0),
        (14.263178112, 13.264405323, -40),
        (21.037029327, 13.264405323, -40),
        (-21.037029327, 13.264405323, 0),
        (-14.263178112, 13.264405323, 0),
        (-14.263178112, 13.264405323, -40),
        (-21.037029327, 13.264405323, -40),
    ]]
    fillet(fillet28_edges, radius=FILLET28_R)

    # Fillet29
    fillet29_edges = [part.edges().sort_by_distance(p)[0] for p in [
        (22.94958298, 3, -40),
        (15.076039158, 3, -40),
        (-22.94958298, 3, -40),
        (-15.076039158, 3, -40),
    ]]
    fillet(fillet29_edges, radius=FILLET29_R)

    # Sketch31 → Cut-Extrude13 (cut)
    with BuildSketch(Plane(origin=(0, 15, 0), x_dir=(1, 0, 0), z_dir=(0, 1, 0))):
        with Locations(Location((-13.949960606, 57.941121237, 0), (0, 0, 270))):
            Circle(SKETCH31_R)
        with Locations(Location((-17.053973756, 48.435065148, 0), (0, 0, 270))):
            Circle(SKETCH31_R)
        with Locations(Location((17.053973756, 48.435065148, 0), (0, 0, 270))):
            Circle(SKETCH31_R)
        with Locations(Location((13.949960606, 57.941121237, 0), (0, 0, 270))):
            Circle(SKETCH31_R)
        with Locations(Location((5, 20, 0), (0, 0, 270))):
            Circle(SKETCH31_R)
        with Locations(Location((-5, 20, 0), (0, 0, 270))):
            Circle(SKETCH31_R)
    extrude(amount=-CUT_EXTRUDE13_DEPTH, mode=Mode.SUBTRACT)

    # Fillet31
    # the kernel refuses this fillet: 5 mm, written as the material it takes off along each edge
    with BuildSketch(Plane(origin=(25, 19.5, 0), x_dir=(0, 0, -1), z_dir=(0, -1, 0)), Plane(origin=(-25, 19.5, 0), x_dir=(1, 0, 0), z_dir=(0, -1, 0))) as fillet31_piece_1:
        with BuildLine():
            CenterArc((FILLET31_R, -FILLET31_R), FILLET31_R, 90, 90)
            Line((0, -FILLET31_R), (0, 0))
            Line((0, 0), (FILLET31_R, 0))
        make_face()
    extrude(amount=32, mode=Mode.SUBTRACT)
    with BuildSketch(Plane(origin=(11.938797241, -9.067886284, -80), x_dir=(0.3104013150238678, 0, 0.9506056088785999), z_dir=(0, 1, 0)), Plane(origin=(-11.938797241, -9.067886284, -80), x_dir=(1, 0, 0), z_dir=(0, 1, 0))) as fillet31_piece_2:
        with BuildLine():
            CenterArc((FILLET31_R * 0.725430902716, -FILLET31_R), FILLET31_R, 90, 71.916582746)
            Line((-FILLET31_R * 0.225174706162, -FILLET31_R * 0.689598684976), (0, 0))
            Line((0, 0), (FILLET31_R * 0.725430902716, 0))
        make_face()
    extrude(amount=21.135772568, mode=Mode.SUBTRACT)

    # Sketch32 → Cut-Extrude16 (cut)
    with BuildSketch(Plane(origin=(0, 0, 0), x_dir=(1, 0, 0), z_dir=(0, 1, 0))):
        Polygon((-12.796540296, 39.926095737), (-2.5, 66), (2.5, 66), (12.796540296, 39.926095737), (12.796540296, 31.1), (-12.796540296, 31.1), align=None)
    extrude(amount=CUT_EXTRUDE16_DEPTH, mode=Mode.SUBTRACT)


solid = part.part
